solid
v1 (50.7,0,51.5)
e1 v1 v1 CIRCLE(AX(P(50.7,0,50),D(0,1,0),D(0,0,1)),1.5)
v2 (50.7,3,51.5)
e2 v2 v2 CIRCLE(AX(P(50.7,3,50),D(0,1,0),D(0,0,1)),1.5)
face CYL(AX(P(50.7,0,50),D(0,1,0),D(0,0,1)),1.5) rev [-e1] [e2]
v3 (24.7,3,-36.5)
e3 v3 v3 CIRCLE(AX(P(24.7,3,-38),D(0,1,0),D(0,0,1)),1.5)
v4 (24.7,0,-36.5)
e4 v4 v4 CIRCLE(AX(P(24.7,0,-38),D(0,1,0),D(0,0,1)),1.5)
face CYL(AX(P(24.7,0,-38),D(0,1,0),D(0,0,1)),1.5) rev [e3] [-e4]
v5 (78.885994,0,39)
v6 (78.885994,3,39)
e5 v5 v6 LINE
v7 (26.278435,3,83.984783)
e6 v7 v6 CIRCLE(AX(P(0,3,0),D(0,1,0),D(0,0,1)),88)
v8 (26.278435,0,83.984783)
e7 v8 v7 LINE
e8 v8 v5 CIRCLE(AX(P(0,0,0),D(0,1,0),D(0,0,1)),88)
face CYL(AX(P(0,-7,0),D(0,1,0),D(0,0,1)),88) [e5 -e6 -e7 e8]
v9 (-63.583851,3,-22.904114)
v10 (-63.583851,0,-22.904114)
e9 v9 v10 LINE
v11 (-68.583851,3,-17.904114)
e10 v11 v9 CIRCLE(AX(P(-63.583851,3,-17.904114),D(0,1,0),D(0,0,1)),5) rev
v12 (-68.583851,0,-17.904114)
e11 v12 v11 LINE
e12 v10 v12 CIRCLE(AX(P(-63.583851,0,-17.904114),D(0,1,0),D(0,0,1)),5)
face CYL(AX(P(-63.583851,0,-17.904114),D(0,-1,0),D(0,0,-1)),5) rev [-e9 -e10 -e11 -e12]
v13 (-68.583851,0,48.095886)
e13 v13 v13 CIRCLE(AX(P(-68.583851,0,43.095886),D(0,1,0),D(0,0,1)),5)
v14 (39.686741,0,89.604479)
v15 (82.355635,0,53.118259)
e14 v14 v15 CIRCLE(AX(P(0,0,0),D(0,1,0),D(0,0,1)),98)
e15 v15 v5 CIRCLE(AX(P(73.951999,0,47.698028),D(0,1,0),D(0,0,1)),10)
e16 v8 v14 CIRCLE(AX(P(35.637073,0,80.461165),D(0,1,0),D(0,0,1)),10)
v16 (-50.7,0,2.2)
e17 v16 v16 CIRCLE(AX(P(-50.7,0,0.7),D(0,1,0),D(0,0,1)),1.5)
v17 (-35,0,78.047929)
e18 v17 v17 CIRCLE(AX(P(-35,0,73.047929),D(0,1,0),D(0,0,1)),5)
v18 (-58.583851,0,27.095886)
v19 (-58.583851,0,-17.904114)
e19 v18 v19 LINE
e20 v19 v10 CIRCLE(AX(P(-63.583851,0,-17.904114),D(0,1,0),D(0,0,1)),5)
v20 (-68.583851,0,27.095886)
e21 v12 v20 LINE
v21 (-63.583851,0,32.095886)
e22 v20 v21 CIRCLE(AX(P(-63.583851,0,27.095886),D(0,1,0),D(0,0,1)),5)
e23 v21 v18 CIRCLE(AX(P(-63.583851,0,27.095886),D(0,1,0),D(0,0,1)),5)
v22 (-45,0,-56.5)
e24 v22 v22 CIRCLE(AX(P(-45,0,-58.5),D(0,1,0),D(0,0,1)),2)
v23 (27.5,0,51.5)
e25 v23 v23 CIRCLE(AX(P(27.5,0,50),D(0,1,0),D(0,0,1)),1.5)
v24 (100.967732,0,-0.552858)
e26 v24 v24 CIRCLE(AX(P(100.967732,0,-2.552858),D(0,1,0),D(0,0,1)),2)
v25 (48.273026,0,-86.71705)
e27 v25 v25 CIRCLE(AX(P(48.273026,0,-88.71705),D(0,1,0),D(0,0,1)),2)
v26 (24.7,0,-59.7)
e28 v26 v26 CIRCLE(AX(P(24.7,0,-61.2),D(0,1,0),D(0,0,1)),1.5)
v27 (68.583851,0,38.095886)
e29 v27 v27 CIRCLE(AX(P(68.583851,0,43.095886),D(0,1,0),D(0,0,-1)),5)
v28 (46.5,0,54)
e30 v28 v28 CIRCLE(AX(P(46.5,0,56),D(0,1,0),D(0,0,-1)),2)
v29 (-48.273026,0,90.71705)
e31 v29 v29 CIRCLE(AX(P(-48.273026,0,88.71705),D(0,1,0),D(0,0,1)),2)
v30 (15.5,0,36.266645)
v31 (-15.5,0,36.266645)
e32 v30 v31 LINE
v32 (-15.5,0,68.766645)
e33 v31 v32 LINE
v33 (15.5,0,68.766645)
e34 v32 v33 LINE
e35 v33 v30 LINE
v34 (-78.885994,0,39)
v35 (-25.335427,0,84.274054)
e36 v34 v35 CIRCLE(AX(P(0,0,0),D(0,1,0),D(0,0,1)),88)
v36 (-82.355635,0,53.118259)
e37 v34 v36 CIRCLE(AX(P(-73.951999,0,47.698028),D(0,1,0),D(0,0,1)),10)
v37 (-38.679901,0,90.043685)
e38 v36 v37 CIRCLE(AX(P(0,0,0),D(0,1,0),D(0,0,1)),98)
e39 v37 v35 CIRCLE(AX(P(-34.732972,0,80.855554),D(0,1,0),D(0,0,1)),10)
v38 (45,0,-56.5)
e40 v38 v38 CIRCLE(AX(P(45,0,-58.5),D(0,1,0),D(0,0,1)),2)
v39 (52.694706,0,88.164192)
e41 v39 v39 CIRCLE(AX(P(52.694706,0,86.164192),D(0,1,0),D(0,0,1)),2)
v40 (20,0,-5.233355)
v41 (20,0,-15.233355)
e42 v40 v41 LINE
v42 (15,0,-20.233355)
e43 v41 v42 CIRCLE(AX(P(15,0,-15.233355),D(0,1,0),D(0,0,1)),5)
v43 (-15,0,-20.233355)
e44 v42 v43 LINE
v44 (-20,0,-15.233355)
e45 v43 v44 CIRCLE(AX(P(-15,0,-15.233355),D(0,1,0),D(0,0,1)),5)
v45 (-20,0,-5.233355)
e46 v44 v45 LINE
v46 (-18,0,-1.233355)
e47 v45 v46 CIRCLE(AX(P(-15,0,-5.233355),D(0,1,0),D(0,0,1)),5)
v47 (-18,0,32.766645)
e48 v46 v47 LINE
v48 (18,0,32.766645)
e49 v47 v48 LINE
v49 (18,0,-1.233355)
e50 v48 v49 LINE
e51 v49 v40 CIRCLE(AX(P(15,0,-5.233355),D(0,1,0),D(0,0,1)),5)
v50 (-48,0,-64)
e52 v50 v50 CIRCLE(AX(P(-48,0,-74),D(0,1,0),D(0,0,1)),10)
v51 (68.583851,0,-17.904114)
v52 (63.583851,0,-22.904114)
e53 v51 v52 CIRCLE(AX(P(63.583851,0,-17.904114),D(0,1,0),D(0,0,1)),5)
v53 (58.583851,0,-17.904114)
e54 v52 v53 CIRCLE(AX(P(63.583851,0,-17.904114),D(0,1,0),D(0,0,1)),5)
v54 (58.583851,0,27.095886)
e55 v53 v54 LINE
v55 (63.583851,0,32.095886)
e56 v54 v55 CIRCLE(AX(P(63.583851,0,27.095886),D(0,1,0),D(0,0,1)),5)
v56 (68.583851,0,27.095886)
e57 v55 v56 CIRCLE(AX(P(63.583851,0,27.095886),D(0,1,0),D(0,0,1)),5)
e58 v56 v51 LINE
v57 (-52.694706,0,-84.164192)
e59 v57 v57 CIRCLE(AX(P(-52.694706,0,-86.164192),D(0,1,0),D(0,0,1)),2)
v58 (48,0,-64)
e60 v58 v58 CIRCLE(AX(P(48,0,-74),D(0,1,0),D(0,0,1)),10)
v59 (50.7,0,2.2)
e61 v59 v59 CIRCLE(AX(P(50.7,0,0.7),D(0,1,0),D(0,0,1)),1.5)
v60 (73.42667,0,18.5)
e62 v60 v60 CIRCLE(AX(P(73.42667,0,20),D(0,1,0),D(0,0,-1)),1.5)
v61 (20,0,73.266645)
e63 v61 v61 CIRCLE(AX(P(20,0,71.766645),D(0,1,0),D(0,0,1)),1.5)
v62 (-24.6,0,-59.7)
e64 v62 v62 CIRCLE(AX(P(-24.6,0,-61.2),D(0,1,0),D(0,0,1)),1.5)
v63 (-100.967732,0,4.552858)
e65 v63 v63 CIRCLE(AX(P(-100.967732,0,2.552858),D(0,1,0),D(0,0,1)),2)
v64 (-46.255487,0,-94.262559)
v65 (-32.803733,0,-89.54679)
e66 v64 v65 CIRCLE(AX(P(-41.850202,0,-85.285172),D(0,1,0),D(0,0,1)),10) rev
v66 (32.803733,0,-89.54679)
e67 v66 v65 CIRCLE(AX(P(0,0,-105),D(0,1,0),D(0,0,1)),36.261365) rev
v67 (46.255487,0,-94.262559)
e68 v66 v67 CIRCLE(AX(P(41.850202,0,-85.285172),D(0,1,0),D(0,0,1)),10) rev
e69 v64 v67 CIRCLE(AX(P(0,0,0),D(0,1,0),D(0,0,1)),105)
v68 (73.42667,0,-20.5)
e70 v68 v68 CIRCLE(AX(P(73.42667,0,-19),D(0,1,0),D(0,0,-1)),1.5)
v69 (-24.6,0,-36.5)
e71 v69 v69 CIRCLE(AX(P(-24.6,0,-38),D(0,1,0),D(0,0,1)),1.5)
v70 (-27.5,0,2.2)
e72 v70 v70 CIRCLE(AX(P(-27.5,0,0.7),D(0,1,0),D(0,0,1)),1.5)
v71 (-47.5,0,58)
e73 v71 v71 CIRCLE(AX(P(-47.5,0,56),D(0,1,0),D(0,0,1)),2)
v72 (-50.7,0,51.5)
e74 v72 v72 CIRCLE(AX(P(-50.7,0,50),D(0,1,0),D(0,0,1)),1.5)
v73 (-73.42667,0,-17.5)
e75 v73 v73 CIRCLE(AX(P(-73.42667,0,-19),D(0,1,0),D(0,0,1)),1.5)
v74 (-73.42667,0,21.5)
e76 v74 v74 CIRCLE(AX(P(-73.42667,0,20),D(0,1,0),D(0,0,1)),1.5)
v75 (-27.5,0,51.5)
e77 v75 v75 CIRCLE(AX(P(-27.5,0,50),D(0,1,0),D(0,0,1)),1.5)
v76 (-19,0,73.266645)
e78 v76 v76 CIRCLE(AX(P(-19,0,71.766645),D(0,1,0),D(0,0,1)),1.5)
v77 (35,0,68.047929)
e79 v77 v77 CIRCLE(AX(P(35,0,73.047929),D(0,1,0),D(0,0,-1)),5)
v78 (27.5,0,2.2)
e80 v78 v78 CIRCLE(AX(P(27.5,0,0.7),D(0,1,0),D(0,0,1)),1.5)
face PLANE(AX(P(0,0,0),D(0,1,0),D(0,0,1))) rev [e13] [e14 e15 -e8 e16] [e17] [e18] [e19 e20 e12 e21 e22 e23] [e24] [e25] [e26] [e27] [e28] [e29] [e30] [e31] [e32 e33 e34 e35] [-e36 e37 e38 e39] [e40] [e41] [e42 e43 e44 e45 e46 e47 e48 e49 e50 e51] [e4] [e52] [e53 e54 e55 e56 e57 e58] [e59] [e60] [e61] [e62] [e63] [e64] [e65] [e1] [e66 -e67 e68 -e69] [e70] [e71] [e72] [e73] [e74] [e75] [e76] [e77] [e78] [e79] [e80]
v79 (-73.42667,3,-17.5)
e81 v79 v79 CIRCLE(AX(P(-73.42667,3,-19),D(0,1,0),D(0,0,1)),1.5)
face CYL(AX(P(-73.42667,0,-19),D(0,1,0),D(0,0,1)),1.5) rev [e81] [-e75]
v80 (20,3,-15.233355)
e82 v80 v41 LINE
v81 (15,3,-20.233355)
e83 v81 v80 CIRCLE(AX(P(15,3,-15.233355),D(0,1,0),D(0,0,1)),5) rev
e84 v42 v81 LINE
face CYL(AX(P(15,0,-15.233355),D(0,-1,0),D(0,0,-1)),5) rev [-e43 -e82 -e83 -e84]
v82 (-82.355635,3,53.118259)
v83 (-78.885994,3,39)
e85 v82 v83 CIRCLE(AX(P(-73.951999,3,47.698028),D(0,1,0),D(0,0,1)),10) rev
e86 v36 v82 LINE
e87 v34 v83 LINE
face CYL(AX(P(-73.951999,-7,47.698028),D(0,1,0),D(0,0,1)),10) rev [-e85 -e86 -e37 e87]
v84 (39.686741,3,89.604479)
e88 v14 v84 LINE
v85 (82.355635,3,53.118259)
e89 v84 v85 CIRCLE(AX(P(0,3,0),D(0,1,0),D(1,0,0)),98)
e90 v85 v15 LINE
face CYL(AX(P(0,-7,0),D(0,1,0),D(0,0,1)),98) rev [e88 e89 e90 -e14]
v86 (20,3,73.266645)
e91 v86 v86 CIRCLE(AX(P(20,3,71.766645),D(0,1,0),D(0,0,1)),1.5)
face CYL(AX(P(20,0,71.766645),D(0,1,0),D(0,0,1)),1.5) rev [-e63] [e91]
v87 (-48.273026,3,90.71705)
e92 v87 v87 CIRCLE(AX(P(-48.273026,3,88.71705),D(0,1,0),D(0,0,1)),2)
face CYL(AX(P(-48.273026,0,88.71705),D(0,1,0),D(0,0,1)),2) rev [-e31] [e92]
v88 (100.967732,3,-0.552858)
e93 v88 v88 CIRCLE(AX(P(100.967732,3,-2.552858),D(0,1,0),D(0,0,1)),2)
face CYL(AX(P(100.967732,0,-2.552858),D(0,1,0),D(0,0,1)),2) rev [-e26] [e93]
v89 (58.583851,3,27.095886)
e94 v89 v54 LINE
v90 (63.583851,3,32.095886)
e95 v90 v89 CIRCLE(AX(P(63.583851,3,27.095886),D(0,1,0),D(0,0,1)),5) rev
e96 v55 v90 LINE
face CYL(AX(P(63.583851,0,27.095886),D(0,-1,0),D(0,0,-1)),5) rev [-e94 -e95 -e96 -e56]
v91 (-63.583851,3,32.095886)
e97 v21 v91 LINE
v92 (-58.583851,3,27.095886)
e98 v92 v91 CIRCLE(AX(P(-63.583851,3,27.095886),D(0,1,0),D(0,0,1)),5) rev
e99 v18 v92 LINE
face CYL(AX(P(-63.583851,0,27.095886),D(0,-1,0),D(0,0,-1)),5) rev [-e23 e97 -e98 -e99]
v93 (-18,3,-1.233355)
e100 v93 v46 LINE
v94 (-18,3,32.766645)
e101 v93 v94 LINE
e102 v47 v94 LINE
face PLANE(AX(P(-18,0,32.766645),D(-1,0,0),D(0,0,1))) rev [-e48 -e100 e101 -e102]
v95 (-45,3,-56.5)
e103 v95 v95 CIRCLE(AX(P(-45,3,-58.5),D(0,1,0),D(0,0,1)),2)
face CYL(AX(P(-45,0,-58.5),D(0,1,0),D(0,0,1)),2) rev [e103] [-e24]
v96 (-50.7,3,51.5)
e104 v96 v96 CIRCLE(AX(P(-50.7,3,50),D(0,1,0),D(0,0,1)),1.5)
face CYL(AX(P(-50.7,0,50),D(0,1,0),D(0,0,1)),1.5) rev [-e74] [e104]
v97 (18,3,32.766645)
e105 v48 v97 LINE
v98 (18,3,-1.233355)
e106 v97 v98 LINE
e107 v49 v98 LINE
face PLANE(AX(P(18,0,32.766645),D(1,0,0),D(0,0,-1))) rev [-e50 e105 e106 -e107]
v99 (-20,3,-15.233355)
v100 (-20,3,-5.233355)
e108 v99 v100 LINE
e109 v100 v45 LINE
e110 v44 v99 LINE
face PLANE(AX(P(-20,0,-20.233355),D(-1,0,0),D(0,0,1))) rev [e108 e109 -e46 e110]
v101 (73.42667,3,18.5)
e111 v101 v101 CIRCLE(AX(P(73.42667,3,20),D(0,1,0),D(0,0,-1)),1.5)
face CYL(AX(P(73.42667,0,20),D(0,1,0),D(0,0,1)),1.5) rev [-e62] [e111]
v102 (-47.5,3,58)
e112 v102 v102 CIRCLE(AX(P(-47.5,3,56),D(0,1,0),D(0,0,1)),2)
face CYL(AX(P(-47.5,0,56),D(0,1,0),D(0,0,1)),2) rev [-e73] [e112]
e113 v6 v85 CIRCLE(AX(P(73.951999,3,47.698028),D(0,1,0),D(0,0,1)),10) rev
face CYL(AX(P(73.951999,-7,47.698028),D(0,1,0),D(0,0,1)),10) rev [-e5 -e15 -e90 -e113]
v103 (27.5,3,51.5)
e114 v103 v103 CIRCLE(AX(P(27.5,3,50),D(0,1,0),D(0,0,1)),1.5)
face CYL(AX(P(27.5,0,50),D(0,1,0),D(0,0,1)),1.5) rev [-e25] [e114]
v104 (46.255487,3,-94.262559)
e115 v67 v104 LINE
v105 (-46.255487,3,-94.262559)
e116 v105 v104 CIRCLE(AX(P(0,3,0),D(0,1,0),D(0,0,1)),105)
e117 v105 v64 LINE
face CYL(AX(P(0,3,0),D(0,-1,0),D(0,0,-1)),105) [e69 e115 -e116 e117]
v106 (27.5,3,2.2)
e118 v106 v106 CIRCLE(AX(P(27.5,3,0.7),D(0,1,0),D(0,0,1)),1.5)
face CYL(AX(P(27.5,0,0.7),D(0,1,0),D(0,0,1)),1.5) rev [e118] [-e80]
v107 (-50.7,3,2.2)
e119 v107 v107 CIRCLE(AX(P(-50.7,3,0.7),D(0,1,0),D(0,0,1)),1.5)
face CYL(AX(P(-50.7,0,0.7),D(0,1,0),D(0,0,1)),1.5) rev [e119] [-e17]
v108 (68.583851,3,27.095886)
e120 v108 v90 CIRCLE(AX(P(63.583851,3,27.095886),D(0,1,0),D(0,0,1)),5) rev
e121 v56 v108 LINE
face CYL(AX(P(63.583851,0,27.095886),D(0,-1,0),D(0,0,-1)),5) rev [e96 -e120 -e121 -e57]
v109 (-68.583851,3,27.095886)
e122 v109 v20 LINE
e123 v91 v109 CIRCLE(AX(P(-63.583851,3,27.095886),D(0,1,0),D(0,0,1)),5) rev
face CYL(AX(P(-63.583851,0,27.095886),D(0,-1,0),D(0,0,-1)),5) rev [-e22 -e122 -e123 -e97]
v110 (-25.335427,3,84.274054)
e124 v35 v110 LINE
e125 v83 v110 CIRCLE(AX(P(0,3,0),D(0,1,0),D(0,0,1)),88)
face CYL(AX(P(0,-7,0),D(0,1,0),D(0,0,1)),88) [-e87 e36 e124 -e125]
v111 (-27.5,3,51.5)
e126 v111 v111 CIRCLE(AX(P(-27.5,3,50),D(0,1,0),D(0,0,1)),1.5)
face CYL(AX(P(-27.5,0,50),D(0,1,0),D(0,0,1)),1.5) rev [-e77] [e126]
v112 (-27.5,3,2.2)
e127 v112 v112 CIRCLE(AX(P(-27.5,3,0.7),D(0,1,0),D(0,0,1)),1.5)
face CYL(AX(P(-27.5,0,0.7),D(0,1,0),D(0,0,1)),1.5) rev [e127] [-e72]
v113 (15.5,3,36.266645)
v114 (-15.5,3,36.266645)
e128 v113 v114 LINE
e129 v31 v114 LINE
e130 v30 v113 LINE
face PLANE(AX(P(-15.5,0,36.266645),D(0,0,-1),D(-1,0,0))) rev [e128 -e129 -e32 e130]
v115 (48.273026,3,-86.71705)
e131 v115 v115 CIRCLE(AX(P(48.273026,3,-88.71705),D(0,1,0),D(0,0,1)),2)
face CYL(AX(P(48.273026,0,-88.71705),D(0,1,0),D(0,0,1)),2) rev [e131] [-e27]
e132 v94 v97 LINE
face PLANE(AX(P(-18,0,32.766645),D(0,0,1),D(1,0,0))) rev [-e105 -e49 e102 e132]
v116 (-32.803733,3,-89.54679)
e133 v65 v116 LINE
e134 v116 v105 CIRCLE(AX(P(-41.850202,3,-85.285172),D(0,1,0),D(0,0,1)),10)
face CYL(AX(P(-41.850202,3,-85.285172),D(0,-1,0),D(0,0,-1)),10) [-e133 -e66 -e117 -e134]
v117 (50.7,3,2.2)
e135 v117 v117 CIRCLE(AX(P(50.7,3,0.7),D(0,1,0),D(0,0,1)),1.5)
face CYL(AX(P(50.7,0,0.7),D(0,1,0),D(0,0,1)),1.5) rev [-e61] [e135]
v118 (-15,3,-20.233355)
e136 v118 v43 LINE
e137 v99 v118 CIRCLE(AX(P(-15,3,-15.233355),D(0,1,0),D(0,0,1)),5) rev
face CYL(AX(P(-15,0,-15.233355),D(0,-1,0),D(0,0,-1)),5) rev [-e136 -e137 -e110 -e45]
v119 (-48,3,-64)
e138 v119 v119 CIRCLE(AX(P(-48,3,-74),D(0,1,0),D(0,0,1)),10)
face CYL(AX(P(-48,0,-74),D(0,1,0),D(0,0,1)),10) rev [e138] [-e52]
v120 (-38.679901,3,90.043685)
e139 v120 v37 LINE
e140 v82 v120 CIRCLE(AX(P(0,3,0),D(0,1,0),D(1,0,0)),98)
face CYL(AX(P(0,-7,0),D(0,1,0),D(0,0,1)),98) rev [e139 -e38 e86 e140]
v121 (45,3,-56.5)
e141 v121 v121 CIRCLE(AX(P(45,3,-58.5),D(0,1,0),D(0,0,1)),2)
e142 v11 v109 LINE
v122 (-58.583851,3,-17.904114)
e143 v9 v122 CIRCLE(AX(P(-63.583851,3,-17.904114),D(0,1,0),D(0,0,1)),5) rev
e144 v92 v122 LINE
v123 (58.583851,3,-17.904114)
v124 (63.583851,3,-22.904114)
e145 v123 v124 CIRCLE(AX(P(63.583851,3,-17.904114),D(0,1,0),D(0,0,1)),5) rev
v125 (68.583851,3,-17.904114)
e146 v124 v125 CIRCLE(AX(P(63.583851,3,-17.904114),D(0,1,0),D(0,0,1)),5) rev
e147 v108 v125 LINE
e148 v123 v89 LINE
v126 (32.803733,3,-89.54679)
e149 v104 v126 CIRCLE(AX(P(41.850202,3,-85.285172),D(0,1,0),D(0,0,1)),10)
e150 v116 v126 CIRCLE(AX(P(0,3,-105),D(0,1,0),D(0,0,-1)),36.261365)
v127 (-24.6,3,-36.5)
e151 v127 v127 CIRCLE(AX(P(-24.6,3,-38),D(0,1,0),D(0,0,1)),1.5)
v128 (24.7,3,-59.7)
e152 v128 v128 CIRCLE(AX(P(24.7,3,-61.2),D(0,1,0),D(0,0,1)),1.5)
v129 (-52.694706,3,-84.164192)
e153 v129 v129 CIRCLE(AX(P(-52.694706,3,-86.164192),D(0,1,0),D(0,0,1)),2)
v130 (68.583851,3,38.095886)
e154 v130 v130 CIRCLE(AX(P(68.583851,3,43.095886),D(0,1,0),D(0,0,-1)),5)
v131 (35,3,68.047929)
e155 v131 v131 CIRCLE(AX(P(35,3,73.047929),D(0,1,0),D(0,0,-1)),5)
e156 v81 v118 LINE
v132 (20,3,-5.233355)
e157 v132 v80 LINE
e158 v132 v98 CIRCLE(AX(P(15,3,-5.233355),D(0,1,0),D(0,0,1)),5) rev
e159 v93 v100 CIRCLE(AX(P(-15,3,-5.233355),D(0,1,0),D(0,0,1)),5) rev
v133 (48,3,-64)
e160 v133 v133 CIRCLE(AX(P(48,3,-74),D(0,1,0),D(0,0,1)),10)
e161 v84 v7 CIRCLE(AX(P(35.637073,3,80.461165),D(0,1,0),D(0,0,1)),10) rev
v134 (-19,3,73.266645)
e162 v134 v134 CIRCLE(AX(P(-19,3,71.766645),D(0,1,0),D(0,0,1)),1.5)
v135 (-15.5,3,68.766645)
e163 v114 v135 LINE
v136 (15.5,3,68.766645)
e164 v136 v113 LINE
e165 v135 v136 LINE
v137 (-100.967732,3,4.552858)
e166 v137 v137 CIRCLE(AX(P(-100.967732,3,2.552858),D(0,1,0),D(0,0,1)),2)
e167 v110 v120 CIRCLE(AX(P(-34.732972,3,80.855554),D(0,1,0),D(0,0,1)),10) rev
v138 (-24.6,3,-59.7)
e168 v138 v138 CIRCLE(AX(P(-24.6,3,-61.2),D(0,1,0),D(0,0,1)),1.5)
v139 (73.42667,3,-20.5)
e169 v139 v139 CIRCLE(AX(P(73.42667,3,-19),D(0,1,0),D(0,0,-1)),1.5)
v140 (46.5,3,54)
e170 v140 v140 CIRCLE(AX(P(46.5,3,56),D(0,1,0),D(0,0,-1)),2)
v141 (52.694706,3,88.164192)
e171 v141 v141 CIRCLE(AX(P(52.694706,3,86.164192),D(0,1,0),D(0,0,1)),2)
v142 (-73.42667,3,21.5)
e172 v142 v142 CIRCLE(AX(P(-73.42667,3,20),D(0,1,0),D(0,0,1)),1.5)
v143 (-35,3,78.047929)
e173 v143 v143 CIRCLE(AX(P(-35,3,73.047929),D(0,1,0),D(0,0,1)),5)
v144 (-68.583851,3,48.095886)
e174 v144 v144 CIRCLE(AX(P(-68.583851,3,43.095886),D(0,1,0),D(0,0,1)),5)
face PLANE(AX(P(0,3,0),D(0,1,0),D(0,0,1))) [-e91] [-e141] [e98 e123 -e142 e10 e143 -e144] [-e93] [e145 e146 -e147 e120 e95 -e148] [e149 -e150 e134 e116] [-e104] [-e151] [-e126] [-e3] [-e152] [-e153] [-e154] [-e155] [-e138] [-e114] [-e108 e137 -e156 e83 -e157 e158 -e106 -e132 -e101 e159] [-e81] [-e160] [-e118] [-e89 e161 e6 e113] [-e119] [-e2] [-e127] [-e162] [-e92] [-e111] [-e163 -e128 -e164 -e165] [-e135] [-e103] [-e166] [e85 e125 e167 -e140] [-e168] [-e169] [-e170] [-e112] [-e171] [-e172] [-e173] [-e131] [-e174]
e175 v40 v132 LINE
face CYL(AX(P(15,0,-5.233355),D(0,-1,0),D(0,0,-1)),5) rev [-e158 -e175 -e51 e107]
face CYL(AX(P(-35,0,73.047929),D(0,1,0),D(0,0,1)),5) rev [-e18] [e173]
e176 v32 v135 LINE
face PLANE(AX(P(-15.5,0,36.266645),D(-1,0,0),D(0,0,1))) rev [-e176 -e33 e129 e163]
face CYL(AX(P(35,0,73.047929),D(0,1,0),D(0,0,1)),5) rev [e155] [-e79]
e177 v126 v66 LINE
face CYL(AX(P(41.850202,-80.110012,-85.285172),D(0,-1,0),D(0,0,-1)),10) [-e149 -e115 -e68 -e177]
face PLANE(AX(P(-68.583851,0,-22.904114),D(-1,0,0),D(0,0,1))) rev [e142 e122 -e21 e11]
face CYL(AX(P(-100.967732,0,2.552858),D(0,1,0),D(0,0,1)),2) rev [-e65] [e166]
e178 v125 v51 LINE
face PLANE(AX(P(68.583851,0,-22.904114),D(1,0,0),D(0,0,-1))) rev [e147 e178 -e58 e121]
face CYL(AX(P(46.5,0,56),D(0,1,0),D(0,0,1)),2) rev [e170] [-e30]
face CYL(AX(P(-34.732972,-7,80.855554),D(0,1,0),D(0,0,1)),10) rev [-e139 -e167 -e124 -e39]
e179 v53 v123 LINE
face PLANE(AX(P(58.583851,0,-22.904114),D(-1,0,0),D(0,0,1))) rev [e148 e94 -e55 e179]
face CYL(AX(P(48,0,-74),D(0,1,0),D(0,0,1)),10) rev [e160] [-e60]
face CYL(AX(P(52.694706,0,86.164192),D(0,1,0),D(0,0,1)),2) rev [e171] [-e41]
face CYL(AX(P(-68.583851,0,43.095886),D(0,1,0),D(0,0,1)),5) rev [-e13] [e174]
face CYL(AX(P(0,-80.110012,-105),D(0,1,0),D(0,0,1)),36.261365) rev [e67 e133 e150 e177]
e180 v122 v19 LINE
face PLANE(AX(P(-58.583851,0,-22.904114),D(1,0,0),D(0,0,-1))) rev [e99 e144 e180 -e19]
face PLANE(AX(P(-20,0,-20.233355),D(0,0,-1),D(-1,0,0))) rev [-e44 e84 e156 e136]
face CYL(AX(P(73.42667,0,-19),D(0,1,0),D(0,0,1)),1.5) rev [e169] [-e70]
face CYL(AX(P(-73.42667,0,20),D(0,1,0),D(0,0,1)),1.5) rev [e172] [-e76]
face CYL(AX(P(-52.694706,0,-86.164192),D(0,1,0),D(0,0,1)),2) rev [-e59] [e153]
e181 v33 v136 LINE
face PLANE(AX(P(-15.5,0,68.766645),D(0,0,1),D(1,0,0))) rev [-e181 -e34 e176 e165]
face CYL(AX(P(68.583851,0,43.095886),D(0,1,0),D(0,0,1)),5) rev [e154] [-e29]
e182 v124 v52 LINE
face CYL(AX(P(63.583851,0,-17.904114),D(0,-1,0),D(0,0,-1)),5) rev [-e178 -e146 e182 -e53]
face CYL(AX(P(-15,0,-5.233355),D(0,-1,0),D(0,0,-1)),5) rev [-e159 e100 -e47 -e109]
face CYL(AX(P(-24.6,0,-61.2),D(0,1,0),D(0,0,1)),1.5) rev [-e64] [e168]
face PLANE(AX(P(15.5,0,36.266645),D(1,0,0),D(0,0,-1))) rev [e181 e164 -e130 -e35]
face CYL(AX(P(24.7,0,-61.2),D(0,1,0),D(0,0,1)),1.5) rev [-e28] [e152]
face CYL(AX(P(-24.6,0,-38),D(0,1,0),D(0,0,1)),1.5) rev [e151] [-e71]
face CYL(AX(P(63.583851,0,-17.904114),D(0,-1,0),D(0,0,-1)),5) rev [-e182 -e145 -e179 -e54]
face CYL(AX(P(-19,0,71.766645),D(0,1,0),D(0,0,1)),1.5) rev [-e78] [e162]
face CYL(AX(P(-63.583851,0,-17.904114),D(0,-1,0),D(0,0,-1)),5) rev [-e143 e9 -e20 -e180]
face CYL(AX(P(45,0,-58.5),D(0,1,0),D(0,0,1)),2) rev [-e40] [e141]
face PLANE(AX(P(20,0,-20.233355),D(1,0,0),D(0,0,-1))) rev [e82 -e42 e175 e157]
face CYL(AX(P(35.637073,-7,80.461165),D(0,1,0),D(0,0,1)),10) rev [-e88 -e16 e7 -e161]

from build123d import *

# Parameters (mm, degrees)
CROQUIS1_R                   = 105
SALIENTE_EXTRUIR1_DEPTH      = 3
CORTAR_EXTRUIR1_START        = -3
CORTAR_EXTRUIR1_DEPTH        = 3
REDONDEO1_R                  = 10
CROQUIS6_R                   = 1.5
CORTAR_EXTRUIR10_DEPTH       = 149.522725677
CROQUIS12_W                  = 31
CROQUIS12_H                  = 32.5
CROQUIS12_W_2                = 36
CROQUIS12_H_2                = 23
CORTAR_EXTRUIR13_DEPTH       = 149.522725677
CROQUIS16_R                  = 1.5
CORTAR_EXTRUIR16_DEPTH       = 149.522725677
CORTAR_EXTRUIR_L_MINA2_DEPTH = 10
CROQUIS18_R                  = 5
CROQUIS18_R_2                = 10
CROQUIS18_W                  = 40
CROQUIS18_H                  = 20
CROQUIS18_W_2                = 10
CROQUIS18_H_2                = 55
CORTAR_EXTRUIR17_DEPTH       = 149.522725677
REDONDEO2_R                  = 5
REDONDEO3_R                  = 10
CROQUIS19_R                  = 2
CORTAR_EXTRUIR18_DEPTH       = 149.522725677
CROQUIS20_R                  = 2
CORTAR_EXTRUIR19_DEPTH       = 149.522725677
CROQUIS21_W                  = 36
CROQUIS21_H                  = 12
CORTAR_EXTRUIR20_DEPTH       = 149.522725677


# Some blends are built 0.0001 mm under size
with BuildPart() as part:
    # Croquis1 → Saliente-Extruir1 (new body)
    with BuildSketch(Plane(origin=(0, 0, 0), x_dir=(1, 0, 0), z_dir=(0, 1, 0))):
        with Locations(Location((0, 0, 0), (0, 0, 270))):
            Circle(CROQUIS1_R)
    extrude(amount=SALIENTE_EXTRUIR1_DEPTH)

    # Croquis2 → Cortar-Extruir1 (cut)
    with BuildSketch(Plane(origin=(0, 3, 0), x_dir=(1, 0, 0), z_dir=(0, 1, 0)).offset(CORTAR_EXTRUIR1_START)):
        with BuildLine():
            ThreePointArc((35.71668902, 98.738635424), (0, 68.738635424), (-35.71668902, 98.738635424))
            ThreePointArc((-35.71668902, 98.738635424), (0, 105), (35.71668902, 98.738635424))
        make_face()
    extrude(amount=CORTAR_EXTRUIR1_DEPTH, mode=Mode.SUBTRACT)

    # Redondeo1
    redondeo1_edges = [part.edges().sort_by_distance(p)[0] for p in [
        (-35.71668902, 1.5, -98.738635424),
        (35.71668902, 1.5, -98.738635424),
    ]]
    fillet(redondeo1_edges, radius=REDONDEO1_R)

    # Croquis6 → Cortar-Extruir10 (cut, through all)
    with BuildSketch(Plane(origin=(0, 3, 0), x_dir=(1, 0, 0), z_dir=(0, 1, 0))):
        with Locations(Location((-50.7, -50, 0), (0, 0, 270))):
            Circle(CROQUIS6_R)
        with Locations(Location((-27.5, -50, 0), (0, 0, 270))):
            Circle(CROQUIS6_R)
        with Locations(Location((-50.7, -0.7, 0), (0, 0, 270))):
            Circle(CROQUIS6_R)
        with Locations(Location((-27.5, -0.7, 0), (0, 0, 270))):
            Circle(CROQUIS6_R)
        with Locations(Location((50.7, -0.7, 0), (0, 0, 270))):
            Circle(CROQUIS6_R)
        with Locations(Location((50.7, -50, 0), (0, 0, 270))):
            Circle(CROQUIS6_R)
        with Locations(Location((27.5, -50, 0), (0, 0, 270))):
            Circle(CROQUIS6_R)
        with Locations(Location((27.5, -0.7, 0), (0, 0, 270))):
            Circle(CROQUIS6_R)
        with Locations(Location((-24.6, 38, 0), (0, 0, 270))):
            Circle(CROQUIS6_R)
        with Locations(Location((-24.6, 61.2, 0), (0, 0, 270))):
            Circle(CROQUIS6_R)
        with Locations(Location((24.7, 38, 0), (0, 0, 270))):
            Circle(CROQUIS6_R)
        with Locations(Location((24.7, 61.2, 0), (0, 0, 270))):
            Circle(CROQUIS6_R)
    extrude(amount=-CORTAR_EXTRUIR10_DEPTH, mode=Mode.SUBTRACT)

    # Croquis12 → Cortar-Extruir13 (cut, through all)
    with BuildSketch(Plane(origin=(0, 3, 0), x_dir=(1, 0, 0), z_dir=(0, 1, 0))):
        with Locations((0, -52.516645147)):
            Rectangle(CROQUIS12_W, CROQUIS12_H)
        with Locations((0, -21.266645147)):
            Rectangle(CROQUIS12_W_2, CROQUIS12_H_2)
    extrude(amount=-CORTAR_EXTRUIR13_DEPTH, mode=Mode.SUBTRACT)

    # Croquis16 → Cortar-Extruir16 (cut, through all)
    with BuildSketch(Plane(origin=(0, 3, 0), x_dir=(1, 0, 0), z_dir=(0, 1, 0))):
        with Locations(Location((-19, -71.766645147, 0), (0, 0, 270))):
            Circle(CROQUIS16_R)
        with Locations(Location((20, -71.766645147, 0), (0, 0, 270))):
            Circle(CROQUIS16_R)
        with Locations(Location((-73.426669568, 19, 0), (0, 0, 270))):
            Circle(CROQUIS16_R)
        with Locations(Location((-73.426669568, -20, 0), (0, 0, 270))):
            Circle(CROQUIS16_R)
        with Locations(Location((73.426669568, 19, 0), (0, 0, 90))):
            Circle(CROQUIS16_R)
        with Locations(Location((73.426669568, -20, 0), (0, 0, 90))):
            Circle(CROQUIS16_R)
    extrude(amount=-CORTAR_EXTRUIR16_DEPTH, mode=Mode.SUBTRACT)

    # Croquis17 → Cortar-Extruir-Lámina2 (cut)
    with BuildSketch(Plane(origin=(0, 3, 0), x_dir=(1, 0, 0), z_dir=(0, 1, 0))):
        with BuildLine():
            ThreePointArc((-78.885993687, -39), (-56.815148476, -67.201479921), (-25.335426507, -84.274053917))
            Line((-25.335426507, -84.274053917), (-28.214452247, -93.850650954))
            ThreePointArc((-28.214452247, -93.850650954), (-63.271415348, -74.838011731), (-87.850311152, -43.431818182))
            Line((-87.850311152, -43.431818182), (-78.885993687, -39))
        make_face()
        with BuildLine():
            ThreePointArc((26.278435016, -83.984783462), (57.19088172, -66.882008404), (78.885993687, -39))
            Line((78.885993687, -39), (87.850311152, -43.431818182))
            ThreePointArc((87.850311152, -43.431818182), (63.689845552, -74.482236631), (29.264620814, -93.528508855))
            Line((29.264620814, -93.528508855), (26.278435016, -83.984783462))
        make_face()
    extrude(amount=-CORTAR_EXTRUIR_L_MINA2_DEPTH, mode=Mode.SUBTRACT)

    # Croquis18 → Cortar-Extruir17 (cut, through all)
    with BuildSketch(Plane(origin=(0, 3, 0), x_dir=(1, 0, 0), z_dir=(0, 1, 0))):
        with Locations(Location((-35, -73.047929471, 0), (0, 0, 270))):
            Circle(CROQUIS18_R)
        with Locations(Location((-68.583851236, -43.095885531, 0), (0, 0, 270))):
            Circle(CROQUIS18_R)
        with Locations(Location((35, -73.047929471, 0), (0, 0, 90))):
            Circle(CROQUIS18_R)
        with Locations(Location((68.583851236, -43.095885531, 0), (0, 0, 90))):
            Circle(CROQUIS18_R)
        with Locations(Location((-48, 74, 0), (0, 0, 270))):
            Circle(CROQUIS18_R_2)
        with Locations(Location((48, 74, 0), (0, 0, 270))):
            Circle(CROQUIS18_R_2)
        with Locations((0, 10.233354853)):
            Rectangle(CROQUIS18_W, CROQUIS18_H)
        with Locations((-63.583851236, -4.595885531)):
            Rectangle(CROQUIS18_W_2, CROQUIS18_H_2)
        with Locations((63.583851236, -4.595885531)):
            Rectangle(CROQUIS18_W_2, CROQUIS18_H_2)
    extrude(amount=-CORTAR_EXTRUIR17_DEPTH, mode=Mode.SUBTRACT)

    # Redondeo2
    redondeo2_edges = [part.edges().sort_by_distance(p)[0] for p in [
        (20, 1.5, -0.233354853),
        (20, 1.5, -20.233354853),
        (-20, 1.5, -0.233354853),
        (-20, 1.5, -20.233354853),
        (68.583851236, 1.5, 32.095885531),
        (58.583851236, 1.5, 32.095885531),
        (68.583851236, 1.5, -22.904114469),
        (58.583851236, 1.5, -22.904114469),
        (-58.583851236, 1.5, 32.095885531),
        (-68.583851236, 1.5, 32.095885531),
        (-58.583851236, 1.5, -22.904114469),
        (-68.583851236, 1.5, -22.904114469),
    ]]
    fillet(redondeo2_edges, radius=REDONDEO2_R - 0.0001)  # a hair under: the kernel refuses the full size

    # Redondeo3
    # the kernel refuses this fillet: 10 mm, written as the material it adds along each edge
    with BuildSketch(Plane(origin=(87.850311152, 3, 43.431818182), x_dir=(-0.49339949863850674, 0, 0.8698028137131256), z_dir=(0, -1, 0)), Plane(origin=(-28.214452247, 3, 93.850650954), x_dir=(-0.9397545440307068, 0, -0.3418499626643806), z_dir=(0, -1, 0))) as redondeo3_piece_1:
        with BuildLine():
            CenterArc((10.568181818, 9.983845423), REDONDEO3_R, 180, 93.257196161)
            Line((0.568181818, 9.983845423), (0.368181818, 9.983845423))
            ThreePointArc((0.368181818, 9.983845423), (0.084414001, 5.003286348), (-0.199676908, 0.011363636))
            Line((-0.199676908, 0.011363636), (-0.011363636, -0.199676908))
            ThreePointArc((-0.011363636, -0.199676908), (5.568181818, -0.358314859), (11.147727273, -0.199676908))
            Line((11.147727273, -0.199676908), (11.136363636, 0))
        make_face()
    extrude(amount=3)
    with BuildSketch(Plane(origin=(29.264620814, 3, 93.528508855), x_dir=(0.9358638260686325, 0, -0.35236188649764677), z_dir=(0, -1, 0)), Plane(origin=(-87.850311152, 3, 43.431818182), x_dir=(0.4933994986385089, 0, 0.8698028137131243), z_dir=(0, -1, 0))) as redondeo3_piece_2:
        with BuildLine():
            CenterArc((10.568181818, -9.983845423), REDONDEO3_R, 86.742803839, 93.257196161)
            Line((0.568181818, -9.983845423), (0.368181818, -9.983845423))
            ThreePointArc((0.368181818, -9.983845423), (0.084414001, -5.003286348), (-0.199676908, -0.011363636))
            Line((-0.199676908, -0.011363636), (-0.011363636, 0.199676908))
            ThreePointArc((-0.011363636, 0.199676908), (5.568181818, 0.358314859), (11.147727273, 0.199676908))
            Line((11.147727273, 0.199676908), (11.136363636, 0))
        make_face()
    extrude(amount=3)

    # Croquis19 → Cortar-Extruir18 (cut, through all)
    with BuildSketch(Plane(origin=(0, 3, 0), x_dir=(1, 0, 0), z_dir=(0, 1, 0))):
        with Locations(Location((-100.967732044, -2.552858359, 0), (0, 0, 270))):
            Circle(CROQUIS19_R)
        with Locations(Location((-52.694706213, 86.164191734, 0), (0, 0, 270))):
            Circle(CROQUIS19_R)
        with Locations(Location((48.273025831, 88.717050092, 0), (0, 0, 270))):
            Circle(CROQUIS19_R)
        with Locations(Location((100.967732044, 2.552858359, 0), (0, 0, 270))):
            Circle(CROQUIS19_R)
        with Locations(Location((52.694706213, -86.164191734, 0), (0, 0, 270))):
            Circle(CROQUIS19_R)
        with Locations(Location((-48.273025831, -88.717050092, 0), (0, 0, 270))):
            Circle(CROQUIS19_R)
    extrude(amount=-CORTAR_EXTRUIR18_DEPTH, mode=Mode.SUBTRACT)

    # Croquis20 → Cortar-Extruir19 (cut, through all)
    with BuildSketch(Plane(origin=(0, 3, 0), x_dir=(1, 0, 0), z_dir=(0, 1, 0))):
        with Locations(Location((-47.5, -56, 0), (0, 0, 270))):
            Circle(CROQUIS20_R)
        with Locations(Location((46.5, -56, 0), (0, 0, 90))):
            Circle(CROQUIS20_R)
        with Locations(Location((45, 58.5, 0), (0, 0, 270))):
            Circle(CROQUIS20_R)
        with Locations(Location((-45, 58.5, 0), (0, 0, 270))):
            Circle(CROQUIS20_R)
    extrude(amount=-CORTAR_EXTRUIR19_DEPTH, mode=Mode.SUBTRACT)

    # Croquis21 → Cortar-Extruir20 (cut, through all)
    with BuildSketch(Plane(origin=(0, 3, 0), x_dir=(1, 0, 0), z_dir=(0, 1, 0))):
        with Locations((0, -3.766645147)):
            Rectangle(CROQUIS21_W, CROQUIS21_H)
    extrude(amount=-CORTAR_EXTRUIR20_DEPTH, mode=Mode.SUBTRACT)


solid = part.part
